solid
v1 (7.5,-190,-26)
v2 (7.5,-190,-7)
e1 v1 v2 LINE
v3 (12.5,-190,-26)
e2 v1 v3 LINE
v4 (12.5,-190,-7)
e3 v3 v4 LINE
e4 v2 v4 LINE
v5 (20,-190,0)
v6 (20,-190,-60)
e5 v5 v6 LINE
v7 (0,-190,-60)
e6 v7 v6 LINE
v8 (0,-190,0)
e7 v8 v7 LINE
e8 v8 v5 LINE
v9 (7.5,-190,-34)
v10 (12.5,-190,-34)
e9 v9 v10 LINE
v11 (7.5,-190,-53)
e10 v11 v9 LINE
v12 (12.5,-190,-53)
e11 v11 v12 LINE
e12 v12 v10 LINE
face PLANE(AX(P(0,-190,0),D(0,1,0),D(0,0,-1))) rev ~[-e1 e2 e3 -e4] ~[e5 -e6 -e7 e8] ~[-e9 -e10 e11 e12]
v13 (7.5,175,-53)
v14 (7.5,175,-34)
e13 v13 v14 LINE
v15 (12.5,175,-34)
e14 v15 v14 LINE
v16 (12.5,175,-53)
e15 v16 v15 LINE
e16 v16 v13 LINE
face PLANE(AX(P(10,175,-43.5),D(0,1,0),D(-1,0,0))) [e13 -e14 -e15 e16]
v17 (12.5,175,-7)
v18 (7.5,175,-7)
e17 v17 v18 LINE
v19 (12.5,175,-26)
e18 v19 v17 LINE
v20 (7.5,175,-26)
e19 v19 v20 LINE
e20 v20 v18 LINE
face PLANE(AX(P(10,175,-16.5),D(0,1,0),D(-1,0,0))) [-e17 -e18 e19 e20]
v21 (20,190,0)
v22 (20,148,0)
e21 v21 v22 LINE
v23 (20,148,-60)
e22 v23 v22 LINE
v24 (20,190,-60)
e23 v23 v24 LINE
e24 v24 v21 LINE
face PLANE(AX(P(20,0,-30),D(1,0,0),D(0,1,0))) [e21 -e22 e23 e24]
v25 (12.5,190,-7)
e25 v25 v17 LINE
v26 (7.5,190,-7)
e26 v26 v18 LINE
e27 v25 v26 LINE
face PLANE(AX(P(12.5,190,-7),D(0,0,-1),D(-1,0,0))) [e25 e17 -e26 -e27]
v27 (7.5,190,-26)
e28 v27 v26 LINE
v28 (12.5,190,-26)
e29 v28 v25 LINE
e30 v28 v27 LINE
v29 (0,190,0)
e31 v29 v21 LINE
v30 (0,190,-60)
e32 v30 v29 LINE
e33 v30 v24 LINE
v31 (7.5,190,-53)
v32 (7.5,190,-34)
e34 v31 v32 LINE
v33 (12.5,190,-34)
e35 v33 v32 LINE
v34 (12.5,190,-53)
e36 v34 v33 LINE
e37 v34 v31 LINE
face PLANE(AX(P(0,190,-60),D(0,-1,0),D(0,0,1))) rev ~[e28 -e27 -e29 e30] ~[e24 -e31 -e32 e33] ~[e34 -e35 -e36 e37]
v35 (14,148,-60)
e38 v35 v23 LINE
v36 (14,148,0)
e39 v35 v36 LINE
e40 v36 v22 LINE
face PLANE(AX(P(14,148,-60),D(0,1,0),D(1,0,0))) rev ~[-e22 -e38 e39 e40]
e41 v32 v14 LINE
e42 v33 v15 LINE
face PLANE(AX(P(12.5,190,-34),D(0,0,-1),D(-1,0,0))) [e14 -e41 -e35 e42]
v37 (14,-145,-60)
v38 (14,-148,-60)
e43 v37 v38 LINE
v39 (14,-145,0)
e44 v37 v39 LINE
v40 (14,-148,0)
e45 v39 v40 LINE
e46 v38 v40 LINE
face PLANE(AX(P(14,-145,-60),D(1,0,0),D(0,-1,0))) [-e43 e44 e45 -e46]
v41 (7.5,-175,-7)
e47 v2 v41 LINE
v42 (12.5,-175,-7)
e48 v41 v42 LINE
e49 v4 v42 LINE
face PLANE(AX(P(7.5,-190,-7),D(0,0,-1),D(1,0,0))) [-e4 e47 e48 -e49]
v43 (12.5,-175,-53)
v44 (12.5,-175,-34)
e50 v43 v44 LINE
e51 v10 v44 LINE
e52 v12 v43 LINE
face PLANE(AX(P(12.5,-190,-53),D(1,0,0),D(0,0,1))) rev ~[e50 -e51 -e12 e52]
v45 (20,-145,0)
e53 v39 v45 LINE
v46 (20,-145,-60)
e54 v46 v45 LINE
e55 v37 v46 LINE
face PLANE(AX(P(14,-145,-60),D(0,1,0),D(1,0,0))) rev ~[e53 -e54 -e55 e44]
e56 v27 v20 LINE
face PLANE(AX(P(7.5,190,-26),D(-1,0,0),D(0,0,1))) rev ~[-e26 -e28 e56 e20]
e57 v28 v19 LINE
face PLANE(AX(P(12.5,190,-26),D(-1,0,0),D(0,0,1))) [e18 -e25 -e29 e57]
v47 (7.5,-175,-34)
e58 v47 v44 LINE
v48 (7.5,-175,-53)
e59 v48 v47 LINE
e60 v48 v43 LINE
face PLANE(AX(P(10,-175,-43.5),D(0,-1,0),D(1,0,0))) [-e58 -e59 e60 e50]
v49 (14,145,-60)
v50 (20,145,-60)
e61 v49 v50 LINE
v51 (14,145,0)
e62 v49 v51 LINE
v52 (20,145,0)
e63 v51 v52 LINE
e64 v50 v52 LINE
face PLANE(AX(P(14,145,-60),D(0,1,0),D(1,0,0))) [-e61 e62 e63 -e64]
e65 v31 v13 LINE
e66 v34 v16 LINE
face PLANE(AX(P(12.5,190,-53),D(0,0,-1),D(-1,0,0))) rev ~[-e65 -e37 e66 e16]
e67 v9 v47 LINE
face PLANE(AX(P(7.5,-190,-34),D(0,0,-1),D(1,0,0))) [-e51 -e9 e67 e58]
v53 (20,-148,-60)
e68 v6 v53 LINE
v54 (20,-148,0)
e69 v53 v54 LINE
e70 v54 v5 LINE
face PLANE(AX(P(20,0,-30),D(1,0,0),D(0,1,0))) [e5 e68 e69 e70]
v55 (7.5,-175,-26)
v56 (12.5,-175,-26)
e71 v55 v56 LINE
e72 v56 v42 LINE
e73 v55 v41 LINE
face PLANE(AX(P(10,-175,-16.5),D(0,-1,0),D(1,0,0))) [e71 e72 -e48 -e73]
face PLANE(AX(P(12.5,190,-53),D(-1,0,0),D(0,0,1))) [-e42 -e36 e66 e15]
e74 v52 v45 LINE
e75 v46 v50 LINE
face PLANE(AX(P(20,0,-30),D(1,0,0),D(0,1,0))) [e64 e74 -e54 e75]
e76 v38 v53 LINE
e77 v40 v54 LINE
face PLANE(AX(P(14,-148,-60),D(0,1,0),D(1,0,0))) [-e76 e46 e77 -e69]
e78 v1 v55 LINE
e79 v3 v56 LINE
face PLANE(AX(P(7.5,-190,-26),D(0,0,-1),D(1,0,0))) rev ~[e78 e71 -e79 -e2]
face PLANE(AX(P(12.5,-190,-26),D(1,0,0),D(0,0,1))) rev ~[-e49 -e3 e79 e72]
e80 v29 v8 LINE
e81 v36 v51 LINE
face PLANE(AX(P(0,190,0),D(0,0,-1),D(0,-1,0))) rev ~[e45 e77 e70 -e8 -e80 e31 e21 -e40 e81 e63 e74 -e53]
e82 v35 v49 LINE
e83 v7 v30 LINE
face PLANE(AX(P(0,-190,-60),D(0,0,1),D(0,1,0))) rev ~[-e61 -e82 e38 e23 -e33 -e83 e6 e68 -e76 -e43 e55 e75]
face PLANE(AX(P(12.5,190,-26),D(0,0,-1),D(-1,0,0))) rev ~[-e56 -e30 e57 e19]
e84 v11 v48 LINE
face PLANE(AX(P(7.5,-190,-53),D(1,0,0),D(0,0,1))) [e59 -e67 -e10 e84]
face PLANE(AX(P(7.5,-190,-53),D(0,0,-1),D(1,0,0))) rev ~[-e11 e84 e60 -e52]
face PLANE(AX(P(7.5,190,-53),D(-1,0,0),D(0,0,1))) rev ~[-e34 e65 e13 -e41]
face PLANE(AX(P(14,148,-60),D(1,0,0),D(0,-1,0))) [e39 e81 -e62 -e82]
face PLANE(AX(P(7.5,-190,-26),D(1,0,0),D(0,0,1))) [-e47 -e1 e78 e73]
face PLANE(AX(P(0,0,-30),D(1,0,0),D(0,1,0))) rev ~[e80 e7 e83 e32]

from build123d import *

# Parameters (mm, degrees)
F1_DEPTH = 20
F2_W     = 6
F2_H     = 3
F3_DEPTH = 60
F4_W     = 5
F4_H     = 19
F5_DEPTH = 15
F6_W     = 5
F6_H     = 19
F7_DEPTH = 15


# Not quite as in the source:
# - a feature names something its author has since deleted; it is built from what else it names


with BuildPart() as f1:
    # F0 (on Right) → F1 (new body)
    with BuildSketch(Plane.YZ):
        Polygon((190, 0), (-190, 0), (-190, -60), (0, -60), (190, -60), align=None)
    extrude(amount=F1_DEPTH)

    # F2 (on face) → F3 (cut)
    with BuildSketch(Plane(origin=(0, 0, -60), x_dir=(1, 0, 0), z_dir=(0, 0, -1))):
        with Locations((17, 146.5)):
            Rectangle(F2_W, F2_H)
        with Locations((17, -146.5)):
            Rectangle(F2_W, F2_H)
    extrude(amount=-F3_DEPTH, mode=Mode.SUBTRACT)

    # F4 (on face) → F5 (cut)
    with BuildSketch(Plane.XZ.offset(190)):
        with Locations((10, -16.5)):
            Rectangle(F4_W, F4_H)
        with Locations((10, -43.5)):
            Rectangle(F4_W, F4_H)
    extrude(amount=-F5_DEPTH, mode=Mode.SUBTRACT)

    # F6 (on face) → F7 (cut)
    with BuildSketch(Plane(origin=(0, 190, 0), x_dir=(-1, 0, 0), z_dir=(0, 1, 0))):
        with Locations((-10, -16.5)):
            Rectangle(F6_W, F6_H)
        with Locations((-10, -43.5)):
            Rectangle(F6_W, F6_H)
    extrude(amount=-F7_DEPTH, mode=Mode.SUBTRACT)


solid = f1.part
